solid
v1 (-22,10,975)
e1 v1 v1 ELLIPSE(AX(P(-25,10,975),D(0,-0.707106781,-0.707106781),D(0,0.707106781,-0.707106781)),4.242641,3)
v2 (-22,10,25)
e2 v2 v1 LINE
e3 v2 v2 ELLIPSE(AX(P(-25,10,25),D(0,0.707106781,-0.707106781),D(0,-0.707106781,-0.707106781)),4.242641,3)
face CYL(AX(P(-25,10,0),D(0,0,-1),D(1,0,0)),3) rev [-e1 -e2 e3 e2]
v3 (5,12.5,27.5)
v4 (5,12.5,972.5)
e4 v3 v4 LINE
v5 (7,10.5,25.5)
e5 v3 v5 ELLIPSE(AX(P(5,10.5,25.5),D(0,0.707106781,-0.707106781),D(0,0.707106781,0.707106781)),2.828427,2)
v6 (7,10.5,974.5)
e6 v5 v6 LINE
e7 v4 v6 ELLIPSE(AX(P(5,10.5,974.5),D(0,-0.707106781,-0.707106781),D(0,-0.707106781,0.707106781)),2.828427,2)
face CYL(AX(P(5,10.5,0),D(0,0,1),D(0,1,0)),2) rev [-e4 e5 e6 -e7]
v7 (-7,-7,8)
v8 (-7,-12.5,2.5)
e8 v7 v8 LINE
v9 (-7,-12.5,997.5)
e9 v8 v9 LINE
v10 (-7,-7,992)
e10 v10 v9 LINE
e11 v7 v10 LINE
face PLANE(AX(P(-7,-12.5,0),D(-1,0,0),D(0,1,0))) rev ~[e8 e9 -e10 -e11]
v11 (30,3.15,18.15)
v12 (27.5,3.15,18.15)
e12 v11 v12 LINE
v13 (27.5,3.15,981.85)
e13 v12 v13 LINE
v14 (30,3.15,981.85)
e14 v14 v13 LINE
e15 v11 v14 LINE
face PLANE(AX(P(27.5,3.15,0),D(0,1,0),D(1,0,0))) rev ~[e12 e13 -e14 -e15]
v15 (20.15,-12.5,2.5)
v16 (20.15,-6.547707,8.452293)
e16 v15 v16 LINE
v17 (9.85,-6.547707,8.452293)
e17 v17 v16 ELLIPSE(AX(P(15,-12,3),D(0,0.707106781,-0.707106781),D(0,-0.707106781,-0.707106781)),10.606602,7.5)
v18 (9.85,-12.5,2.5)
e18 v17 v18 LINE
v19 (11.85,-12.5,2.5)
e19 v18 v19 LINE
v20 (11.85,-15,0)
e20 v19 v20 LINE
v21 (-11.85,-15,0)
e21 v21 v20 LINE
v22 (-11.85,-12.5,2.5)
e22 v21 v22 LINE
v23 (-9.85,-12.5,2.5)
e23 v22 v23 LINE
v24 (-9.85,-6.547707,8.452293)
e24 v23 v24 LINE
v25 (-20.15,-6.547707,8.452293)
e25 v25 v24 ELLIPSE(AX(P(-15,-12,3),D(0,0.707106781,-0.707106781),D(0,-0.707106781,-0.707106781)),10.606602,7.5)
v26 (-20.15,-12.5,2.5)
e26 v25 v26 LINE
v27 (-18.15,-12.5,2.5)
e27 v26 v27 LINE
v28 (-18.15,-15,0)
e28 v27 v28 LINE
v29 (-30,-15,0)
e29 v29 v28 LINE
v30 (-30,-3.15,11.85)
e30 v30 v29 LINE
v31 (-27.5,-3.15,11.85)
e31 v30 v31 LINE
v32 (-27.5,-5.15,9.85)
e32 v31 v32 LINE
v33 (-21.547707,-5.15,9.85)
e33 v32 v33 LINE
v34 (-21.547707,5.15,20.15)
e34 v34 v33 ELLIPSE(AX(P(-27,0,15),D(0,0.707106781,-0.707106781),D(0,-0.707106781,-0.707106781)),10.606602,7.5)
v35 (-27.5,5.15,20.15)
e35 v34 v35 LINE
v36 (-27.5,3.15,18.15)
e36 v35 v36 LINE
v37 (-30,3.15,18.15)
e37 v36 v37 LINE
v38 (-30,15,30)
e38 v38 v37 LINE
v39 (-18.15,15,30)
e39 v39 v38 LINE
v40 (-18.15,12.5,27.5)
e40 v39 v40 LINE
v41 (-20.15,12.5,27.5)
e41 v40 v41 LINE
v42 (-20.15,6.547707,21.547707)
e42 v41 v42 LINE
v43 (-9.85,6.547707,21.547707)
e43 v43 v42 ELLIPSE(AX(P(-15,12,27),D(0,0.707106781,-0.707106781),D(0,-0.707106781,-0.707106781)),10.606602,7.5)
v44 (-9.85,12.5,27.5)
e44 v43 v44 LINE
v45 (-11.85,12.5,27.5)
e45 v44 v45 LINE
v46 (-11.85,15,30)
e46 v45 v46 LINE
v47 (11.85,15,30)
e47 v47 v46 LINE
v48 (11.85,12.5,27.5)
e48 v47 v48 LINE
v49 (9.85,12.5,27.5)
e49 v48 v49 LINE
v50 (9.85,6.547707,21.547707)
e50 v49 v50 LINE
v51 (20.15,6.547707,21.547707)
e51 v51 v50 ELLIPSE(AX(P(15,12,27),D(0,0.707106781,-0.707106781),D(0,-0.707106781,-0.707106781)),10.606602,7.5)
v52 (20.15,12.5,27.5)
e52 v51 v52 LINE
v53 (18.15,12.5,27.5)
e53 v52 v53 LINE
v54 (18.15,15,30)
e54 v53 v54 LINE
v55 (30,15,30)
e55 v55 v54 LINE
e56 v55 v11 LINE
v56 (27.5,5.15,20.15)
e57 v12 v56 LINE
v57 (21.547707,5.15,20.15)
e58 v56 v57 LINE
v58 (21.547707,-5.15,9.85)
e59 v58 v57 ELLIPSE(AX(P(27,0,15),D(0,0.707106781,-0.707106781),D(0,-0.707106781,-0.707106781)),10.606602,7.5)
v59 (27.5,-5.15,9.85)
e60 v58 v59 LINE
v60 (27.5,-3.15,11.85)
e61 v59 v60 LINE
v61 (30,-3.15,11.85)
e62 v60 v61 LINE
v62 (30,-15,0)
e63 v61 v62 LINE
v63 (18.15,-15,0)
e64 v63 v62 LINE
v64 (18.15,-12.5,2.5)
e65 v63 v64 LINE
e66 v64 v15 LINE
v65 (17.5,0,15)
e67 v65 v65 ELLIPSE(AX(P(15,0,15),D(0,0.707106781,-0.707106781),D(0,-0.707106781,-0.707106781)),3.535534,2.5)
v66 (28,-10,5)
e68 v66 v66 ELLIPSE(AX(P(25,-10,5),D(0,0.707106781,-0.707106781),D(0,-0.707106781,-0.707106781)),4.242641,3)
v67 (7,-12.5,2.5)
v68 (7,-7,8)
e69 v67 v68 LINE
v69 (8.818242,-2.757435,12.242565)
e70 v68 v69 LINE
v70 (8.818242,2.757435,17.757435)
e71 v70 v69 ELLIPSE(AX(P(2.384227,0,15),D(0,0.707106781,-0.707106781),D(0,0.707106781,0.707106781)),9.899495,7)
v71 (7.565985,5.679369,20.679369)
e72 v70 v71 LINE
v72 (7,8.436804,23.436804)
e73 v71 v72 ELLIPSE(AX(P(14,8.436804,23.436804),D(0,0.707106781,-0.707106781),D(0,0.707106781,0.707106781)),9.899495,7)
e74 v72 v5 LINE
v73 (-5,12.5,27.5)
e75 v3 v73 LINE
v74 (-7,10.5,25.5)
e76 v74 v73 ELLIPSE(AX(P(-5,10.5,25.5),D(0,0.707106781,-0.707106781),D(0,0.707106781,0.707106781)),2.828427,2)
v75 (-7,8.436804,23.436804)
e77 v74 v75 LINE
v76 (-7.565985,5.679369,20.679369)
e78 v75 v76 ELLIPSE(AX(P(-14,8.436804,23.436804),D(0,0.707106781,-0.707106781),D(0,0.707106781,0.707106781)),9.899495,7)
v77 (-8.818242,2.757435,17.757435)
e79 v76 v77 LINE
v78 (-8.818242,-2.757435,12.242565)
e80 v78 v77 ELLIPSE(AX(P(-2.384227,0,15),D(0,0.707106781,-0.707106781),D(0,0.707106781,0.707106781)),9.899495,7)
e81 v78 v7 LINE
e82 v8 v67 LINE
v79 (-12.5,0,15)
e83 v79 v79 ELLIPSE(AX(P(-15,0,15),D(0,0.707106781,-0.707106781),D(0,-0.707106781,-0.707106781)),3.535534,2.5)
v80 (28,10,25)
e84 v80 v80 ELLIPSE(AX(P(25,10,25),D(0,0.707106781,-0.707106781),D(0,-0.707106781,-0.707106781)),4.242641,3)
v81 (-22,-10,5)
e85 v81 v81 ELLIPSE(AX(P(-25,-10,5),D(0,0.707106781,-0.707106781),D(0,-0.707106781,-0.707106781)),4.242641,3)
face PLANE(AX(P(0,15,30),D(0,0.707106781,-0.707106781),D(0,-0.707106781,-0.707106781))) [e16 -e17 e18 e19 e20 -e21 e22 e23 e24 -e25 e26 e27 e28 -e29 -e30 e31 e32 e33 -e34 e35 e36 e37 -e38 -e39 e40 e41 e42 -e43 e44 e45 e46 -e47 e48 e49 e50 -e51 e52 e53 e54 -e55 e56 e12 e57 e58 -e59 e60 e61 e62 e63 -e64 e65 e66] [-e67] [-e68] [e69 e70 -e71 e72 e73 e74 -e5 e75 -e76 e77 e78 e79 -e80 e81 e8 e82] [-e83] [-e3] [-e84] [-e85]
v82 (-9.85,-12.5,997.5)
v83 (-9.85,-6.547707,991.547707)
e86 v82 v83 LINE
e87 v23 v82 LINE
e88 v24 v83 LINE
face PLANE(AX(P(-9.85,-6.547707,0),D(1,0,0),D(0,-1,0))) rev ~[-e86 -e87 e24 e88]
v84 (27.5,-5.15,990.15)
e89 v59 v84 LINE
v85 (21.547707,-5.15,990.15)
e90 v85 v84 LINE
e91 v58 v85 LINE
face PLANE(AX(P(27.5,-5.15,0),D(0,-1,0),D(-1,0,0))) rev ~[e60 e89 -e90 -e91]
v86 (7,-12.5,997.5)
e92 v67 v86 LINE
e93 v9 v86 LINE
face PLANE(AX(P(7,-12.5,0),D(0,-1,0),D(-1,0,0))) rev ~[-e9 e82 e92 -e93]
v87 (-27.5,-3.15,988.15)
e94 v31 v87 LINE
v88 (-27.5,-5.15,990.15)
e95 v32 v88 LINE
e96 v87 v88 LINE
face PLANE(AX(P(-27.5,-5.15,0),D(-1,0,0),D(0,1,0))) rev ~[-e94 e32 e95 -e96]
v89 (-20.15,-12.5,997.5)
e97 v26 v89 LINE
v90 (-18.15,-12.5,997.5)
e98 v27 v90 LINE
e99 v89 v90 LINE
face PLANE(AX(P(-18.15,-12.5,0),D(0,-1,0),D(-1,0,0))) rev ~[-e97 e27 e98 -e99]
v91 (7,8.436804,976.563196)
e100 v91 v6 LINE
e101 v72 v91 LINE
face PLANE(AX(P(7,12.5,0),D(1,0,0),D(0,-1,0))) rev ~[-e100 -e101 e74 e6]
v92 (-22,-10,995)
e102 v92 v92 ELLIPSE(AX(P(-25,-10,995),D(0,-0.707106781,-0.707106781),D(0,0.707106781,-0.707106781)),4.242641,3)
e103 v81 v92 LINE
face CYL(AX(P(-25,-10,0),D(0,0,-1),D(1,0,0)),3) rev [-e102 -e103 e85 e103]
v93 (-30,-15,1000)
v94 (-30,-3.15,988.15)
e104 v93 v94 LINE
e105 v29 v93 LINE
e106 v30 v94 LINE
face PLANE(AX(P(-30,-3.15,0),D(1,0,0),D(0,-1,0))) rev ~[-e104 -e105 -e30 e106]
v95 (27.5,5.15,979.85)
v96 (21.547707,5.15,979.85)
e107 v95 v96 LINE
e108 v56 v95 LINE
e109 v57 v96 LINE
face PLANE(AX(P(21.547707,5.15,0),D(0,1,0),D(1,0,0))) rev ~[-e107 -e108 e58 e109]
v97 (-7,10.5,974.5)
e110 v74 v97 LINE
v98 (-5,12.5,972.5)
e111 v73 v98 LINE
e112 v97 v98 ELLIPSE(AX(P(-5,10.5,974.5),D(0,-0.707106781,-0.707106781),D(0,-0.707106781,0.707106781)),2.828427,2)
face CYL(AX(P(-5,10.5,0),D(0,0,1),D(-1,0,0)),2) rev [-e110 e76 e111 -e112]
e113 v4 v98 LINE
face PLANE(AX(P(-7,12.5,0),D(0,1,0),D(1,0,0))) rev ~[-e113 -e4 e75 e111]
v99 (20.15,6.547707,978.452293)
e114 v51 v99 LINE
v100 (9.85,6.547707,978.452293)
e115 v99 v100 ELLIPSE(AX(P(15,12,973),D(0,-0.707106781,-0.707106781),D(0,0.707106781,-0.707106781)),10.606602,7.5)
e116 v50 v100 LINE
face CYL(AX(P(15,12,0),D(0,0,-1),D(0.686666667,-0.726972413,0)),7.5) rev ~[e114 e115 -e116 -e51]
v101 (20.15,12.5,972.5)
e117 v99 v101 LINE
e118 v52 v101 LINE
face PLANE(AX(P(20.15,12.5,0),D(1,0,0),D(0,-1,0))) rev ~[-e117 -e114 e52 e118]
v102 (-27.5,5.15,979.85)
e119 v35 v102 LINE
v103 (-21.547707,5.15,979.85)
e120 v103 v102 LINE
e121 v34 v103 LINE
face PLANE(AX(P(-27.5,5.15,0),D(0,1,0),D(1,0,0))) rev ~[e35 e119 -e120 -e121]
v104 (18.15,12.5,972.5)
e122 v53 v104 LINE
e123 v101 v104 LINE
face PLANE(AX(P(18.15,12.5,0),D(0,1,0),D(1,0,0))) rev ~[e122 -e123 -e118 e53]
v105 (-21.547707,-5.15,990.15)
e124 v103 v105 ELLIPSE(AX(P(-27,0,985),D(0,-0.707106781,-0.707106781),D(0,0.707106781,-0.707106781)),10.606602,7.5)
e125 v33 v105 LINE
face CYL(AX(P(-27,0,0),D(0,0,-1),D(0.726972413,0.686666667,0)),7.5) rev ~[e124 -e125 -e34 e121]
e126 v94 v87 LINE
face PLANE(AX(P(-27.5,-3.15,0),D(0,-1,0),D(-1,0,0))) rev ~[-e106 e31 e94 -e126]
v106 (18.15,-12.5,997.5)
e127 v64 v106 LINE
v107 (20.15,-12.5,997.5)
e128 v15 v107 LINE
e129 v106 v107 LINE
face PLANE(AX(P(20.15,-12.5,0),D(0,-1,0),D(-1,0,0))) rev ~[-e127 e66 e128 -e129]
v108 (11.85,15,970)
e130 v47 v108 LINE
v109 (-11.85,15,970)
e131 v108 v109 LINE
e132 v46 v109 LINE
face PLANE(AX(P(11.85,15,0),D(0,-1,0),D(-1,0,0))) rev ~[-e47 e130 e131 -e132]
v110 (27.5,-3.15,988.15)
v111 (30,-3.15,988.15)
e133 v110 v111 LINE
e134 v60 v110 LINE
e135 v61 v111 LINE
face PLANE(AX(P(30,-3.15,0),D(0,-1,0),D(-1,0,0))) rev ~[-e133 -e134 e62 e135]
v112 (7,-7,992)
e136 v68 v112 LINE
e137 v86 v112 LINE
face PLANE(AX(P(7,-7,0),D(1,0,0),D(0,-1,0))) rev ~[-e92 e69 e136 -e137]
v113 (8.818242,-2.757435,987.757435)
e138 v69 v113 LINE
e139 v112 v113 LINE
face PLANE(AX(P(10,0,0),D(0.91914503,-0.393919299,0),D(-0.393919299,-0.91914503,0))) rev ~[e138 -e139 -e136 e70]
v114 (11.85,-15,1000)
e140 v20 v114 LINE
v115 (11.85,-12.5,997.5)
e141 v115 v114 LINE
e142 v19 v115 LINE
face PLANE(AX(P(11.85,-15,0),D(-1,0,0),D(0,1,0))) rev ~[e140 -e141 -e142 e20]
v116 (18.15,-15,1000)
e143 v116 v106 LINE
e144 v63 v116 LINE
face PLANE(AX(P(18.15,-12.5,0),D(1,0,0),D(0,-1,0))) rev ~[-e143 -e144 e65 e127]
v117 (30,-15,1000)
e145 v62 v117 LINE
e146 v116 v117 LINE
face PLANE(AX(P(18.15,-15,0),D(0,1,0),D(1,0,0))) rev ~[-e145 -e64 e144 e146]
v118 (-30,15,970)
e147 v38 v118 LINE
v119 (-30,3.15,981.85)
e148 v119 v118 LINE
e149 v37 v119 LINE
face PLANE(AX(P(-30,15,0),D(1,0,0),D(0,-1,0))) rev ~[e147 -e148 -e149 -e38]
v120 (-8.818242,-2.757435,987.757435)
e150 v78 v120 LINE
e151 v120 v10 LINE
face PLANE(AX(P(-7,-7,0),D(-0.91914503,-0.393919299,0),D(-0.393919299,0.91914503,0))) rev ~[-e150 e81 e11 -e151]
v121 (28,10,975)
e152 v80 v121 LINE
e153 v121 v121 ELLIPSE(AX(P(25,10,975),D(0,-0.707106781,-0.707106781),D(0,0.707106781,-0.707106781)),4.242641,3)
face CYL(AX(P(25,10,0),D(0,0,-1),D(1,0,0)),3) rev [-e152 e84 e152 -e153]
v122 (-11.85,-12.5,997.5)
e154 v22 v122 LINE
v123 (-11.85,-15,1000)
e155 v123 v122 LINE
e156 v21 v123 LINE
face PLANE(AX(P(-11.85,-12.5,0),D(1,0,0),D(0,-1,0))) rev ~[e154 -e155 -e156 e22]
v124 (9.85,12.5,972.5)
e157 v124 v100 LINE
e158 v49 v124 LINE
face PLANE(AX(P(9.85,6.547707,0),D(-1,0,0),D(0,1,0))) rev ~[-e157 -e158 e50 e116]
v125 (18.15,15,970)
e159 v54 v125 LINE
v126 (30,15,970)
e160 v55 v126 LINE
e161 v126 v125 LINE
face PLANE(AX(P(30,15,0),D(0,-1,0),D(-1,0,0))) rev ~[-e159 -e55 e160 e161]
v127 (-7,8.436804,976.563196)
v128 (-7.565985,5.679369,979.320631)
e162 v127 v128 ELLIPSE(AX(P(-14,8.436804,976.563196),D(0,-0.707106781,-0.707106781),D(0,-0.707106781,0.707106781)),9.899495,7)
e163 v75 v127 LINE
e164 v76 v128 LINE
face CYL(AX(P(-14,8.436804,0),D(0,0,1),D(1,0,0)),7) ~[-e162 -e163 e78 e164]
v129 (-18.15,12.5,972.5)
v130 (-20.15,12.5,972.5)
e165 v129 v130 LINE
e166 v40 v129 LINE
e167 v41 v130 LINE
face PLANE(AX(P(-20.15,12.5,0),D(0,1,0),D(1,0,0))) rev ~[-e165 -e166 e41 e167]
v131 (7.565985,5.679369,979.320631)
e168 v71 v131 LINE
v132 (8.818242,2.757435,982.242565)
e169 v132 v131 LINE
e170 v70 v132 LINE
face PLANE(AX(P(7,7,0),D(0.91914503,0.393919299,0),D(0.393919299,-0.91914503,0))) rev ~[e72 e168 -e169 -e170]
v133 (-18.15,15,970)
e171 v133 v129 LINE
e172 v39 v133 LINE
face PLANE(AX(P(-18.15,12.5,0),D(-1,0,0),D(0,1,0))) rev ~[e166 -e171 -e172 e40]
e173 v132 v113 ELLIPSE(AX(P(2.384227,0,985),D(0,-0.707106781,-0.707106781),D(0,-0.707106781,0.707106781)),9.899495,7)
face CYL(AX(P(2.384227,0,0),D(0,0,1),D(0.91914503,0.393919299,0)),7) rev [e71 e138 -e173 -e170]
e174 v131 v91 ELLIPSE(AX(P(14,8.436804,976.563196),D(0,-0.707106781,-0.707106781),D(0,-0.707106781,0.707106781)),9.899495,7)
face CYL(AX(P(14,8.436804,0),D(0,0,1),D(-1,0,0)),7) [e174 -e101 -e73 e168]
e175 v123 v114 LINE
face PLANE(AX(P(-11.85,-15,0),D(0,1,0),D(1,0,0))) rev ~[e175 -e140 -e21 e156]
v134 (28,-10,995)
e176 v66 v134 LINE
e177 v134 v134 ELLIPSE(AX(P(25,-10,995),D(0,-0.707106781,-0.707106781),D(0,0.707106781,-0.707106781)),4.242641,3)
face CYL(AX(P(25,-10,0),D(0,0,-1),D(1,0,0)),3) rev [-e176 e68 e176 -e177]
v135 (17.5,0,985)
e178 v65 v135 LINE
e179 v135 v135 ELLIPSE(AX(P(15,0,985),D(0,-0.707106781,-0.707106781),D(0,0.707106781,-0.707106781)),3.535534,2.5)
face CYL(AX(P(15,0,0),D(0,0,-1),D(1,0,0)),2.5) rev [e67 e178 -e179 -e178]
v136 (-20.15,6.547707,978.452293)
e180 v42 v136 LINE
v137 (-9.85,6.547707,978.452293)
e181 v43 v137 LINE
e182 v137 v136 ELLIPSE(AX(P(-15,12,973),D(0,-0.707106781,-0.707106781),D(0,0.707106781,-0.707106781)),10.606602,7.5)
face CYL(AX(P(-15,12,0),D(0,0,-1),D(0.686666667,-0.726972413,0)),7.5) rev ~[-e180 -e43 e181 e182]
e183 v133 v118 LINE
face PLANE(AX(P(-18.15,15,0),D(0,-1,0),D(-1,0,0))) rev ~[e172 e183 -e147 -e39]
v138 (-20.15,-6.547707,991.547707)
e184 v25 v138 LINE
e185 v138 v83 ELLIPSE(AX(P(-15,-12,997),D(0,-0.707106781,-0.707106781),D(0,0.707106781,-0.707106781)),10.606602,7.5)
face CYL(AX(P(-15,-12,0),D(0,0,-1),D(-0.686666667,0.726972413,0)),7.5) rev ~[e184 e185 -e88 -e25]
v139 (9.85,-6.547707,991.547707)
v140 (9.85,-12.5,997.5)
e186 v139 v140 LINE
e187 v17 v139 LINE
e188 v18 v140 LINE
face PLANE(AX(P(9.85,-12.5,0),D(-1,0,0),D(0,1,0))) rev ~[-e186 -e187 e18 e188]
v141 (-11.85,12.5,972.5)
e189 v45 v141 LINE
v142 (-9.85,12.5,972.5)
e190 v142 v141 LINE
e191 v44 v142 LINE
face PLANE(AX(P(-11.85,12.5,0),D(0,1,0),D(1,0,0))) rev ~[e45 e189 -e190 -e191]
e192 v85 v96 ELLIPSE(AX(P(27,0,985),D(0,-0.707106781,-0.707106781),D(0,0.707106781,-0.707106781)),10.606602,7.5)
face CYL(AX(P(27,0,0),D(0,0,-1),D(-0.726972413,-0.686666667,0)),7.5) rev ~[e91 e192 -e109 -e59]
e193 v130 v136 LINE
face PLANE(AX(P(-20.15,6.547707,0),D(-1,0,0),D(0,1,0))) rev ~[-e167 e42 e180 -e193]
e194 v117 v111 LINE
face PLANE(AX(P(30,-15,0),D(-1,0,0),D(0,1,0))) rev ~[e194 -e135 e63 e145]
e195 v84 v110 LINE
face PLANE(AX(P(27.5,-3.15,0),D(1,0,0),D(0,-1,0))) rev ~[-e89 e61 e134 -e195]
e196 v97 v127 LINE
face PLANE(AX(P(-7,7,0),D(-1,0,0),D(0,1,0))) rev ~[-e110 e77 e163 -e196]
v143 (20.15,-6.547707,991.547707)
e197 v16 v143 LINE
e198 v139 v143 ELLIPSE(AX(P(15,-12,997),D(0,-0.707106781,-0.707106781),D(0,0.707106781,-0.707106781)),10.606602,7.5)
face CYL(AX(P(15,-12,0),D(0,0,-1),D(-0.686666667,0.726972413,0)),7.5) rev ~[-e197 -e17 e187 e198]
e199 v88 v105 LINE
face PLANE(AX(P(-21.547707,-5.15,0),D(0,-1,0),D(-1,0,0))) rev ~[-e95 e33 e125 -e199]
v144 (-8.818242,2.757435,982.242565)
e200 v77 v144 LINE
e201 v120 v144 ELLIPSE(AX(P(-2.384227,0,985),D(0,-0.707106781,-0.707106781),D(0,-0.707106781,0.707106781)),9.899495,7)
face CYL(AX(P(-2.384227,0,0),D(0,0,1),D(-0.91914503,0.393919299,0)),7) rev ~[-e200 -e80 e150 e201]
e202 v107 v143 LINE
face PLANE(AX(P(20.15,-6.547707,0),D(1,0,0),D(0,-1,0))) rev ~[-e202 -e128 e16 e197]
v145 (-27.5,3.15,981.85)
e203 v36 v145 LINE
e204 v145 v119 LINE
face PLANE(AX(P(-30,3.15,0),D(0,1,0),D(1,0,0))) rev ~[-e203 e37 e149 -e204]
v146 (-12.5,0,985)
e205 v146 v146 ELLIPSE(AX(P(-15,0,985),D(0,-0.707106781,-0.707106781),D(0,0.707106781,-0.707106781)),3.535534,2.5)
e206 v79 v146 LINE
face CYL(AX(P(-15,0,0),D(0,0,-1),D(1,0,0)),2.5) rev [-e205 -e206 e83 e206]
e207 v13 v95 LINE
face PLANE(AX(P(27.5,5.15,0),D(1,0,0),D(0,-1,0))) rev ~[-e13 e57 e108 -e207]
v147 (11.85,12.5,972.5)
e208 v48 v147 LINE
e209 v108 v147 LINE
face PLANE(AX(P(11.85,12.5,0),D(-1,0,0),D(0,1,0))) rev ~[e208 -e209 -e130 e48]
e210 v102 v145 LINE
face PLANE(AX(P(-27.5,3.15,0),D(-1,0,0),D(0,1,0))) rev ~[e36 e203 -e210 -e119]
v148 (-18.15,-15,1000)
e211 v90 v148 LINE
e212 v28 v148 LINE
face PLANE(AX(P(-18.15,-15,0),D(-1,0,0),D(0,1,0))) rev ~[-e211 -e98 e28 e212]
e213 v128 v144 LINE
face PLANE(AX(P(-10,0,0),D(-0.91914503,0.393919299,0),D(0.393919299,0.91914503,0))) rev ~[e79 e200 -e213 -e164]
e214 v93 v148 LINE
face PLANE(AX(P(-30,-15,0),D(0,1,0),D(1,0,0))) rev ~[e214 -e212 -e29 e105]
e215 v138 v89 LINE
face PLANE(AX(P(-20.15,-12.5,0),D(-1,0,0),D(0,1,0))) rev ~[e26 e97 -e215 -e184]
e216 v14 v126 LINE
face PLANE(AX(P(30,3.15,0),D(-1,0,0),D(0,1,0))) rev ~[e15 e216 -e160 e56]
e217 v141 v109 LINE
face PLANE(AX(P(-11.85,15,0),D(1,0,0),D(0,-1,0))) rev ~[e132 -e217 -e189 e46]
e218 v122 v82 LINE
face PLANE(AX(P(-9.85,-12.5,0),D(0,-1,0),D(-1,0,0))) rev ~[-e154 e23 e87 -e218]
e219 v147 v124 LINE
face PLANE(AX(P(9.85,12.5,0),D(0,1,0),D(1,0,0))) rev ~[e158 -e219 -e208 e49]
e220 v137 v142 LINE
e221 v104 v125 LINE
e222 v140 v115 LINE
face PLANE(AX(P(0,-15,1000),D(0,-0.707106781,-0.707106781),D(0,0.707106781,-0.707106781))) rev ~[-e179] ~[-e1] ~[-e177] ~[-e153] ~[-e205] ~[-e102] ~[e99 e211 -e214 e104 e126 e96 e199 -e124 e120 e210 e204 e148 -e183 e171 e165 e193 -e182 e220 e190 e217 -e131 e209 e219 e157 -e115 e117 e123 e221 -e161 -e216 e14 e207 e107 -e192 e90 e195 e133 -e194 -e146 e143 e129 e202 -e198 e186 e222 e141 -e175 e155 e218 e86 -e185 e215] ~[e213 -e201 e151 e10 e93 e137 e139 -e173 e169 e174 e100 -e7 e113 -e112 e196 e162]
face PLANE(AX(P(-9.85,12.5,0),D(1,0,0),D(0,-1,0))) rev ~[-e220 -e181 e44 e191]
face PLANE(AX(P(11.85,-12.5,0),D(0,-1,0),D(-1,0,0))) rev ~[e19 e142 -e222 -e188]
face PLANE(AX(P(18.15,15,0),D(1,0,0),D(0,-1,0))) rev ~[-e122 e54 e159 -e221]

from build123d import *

# Parameters (mm, degrees)
F0_R     = 3
F0_R_2   = 2.5
F1_DEPTH = 1000
F2_R     = 2
F3_R     = 7
F5_DEPTH = 30


# Not quite as in the source:
# - a feature names something its author has since deleted; it is built from what else it names


with BuildPart() as f1:
    # F0 (on Top) → F1 (new body)
    with BuildSketch(Plane.XY):
        with BuildLine():
            Line((18.15, -15), (30, -15))
            Line((30, -15), (30, -3.15))
            Line((30, -3.15), (27.5, -3.15))
            Line((27.5, -3.15), (27.5, -5.15))
            Line((27.5, -5.15), (21.5477069044, -5.15))
            ThreePointArc((21.5477069044, -5.15), (19.5, 0), (21.5477069044, 5.15))
            Line((21.5477069044, 5.15), (27.5, 5.15))
            Line((27.5, 5.15), (27.5, 3.15))
            Line((27.5, 3.15), (30, 3.15))
            Line((30, 3.15), (30, 15))
            Line((30, 15), (18.15, 15))
            Line((18.15, 15), (18.15, 12.5))
            Line((18.15, 12.5), (20.15, 12.5))
            Line((20.15, 12.5), (20.15, 6.5477069044))
            ThreePointArc((20.15, 6.5477069044), (15, 4.5), (9.85, 6.5477069044))
            Line((9.85, 6.5477069044), (9.85, 12.5))
            Line((9.85, 12.5), (11.85, 12.5))
            Line((11.85, 12.5), (11.85, 15))
            Line((11.85, 15), (-11.85, 15))
            Line((-11.85, 15), (-11.85, 12.5))
            Line((-11.85, 12.5), (-9.85, 12.5))
            Line((-9.85, 12.5), (-9.85, 6.5477069044))
            ThreePointArc((-9.85, 6.5477069044), (-15, 4.5), (-20.15, 6.5477069044))
            Line((-20.15, 6.5477069044), (-20.15, 12.5))
            Line((-20.15, 12.5), (-18.15, 12.5))
            Line((-18.15, 12.5), (-18.15, 15))
            Line((-18.15, 15), (-30, 15))
            Line((-30, 15), (-30, 3.15))
            Line((-30, 3.15), (-27.5, 3.15))
            Line((-27.5, 3.15), (-27.5, 5.15))
            Line((-27.5, 5.15), (-21.5477069044, 5.15))
            ThreePointArc((-21.5477069044, 5.15), (-19.5, 0), (-21.5477069044, -5.15))
            Line((-21.5477069044, -5.15), (-27.5, -5.15))
            Line((-27.5, -5.15), (-27.5, -3.15))
            Line((-27.5, -3.15), (-30, -3.15))
            Line((-30, -3.15), (-30, -15))
            Line((-30, -15), (-18.15, -15))
            Line((-18.15, -15), (-18.15, -12.5))
            Line((-18.15, -12.5), (-20.15, -12.5))
            Line((-20.15, -12.5), (-20.15, -6.5477069044))
            ThreePointArc((-20.15, -6.5477069044), (-15, -4.5), (-9.85, -6.5477069044))
            Line((-9.85, -6.5477069044), (-9.85, -12.5))
            Line((-9.85, -12.5), (-11.85, -12.5))
            Line((-11.85, -12.5), (-11.85, -15))
            Line((-11.85, -15), (11.85, -15))
            Line((11.85, -15), (11.85, -12.5))
            Line((11.85, -12.5), (9.85, -12.5))
            Line((9.85, -12.5), (9.85, -6.5477069044))
            ThreePointArc((9.85, -6.5477069044), (15, -4.5), (20.15, -6.5477069044))
            Line((20.15, -6.5477069044), (20.15, -12.5))
            Line((20.15, -12.5), (18.15, -12.5))
            Line((18.15, -12.5), (18.15, -15))
        make_face()
        with Locations((-25, -10)):
            Circle(F0_R, mode=Mode.SUBTRACT)
        with Locations((25, -10)):
            Circle(F0_R, mode=Mode.SUBTRACT)
        with Locations((-15, 0)):
            Circle(F0_R_2, mode=Mode.SUBTRACT)
        with Locations((-25, 10)):
            Circle(F0_R, mode=Mode.SUBTRACT)
        Polygon((-7, 7), (-7, 12.5), (0, 12.5), (7, 12.5), (7, 7), (10, 0), (7, -7), (7, -12.5), (0, -12.5), (-7, -12.5), (-7, -7), (-10, 0), align=None, mode=Mode.SUBTRACT)
        with Locations((15, 0)):
            Circle(F0_R_2, mode=Mode.SUBTRACT)
        with Locations((25, 10)):
            Circle(F0_R, mode=Mode.SUBTRACT)
    extrude(amount=F1_DEPTH)

    # F2
    f2_edges = [f1.edges().sort_by_distance(p)[0] for p in [
        (-7, 12.5, 500),
        (7, 12.5, 500),
    ]]
    fillet(f2_edges, radius=F2_R)

    # F3
    f3_edges = [f1.edges().sort_by_distance(p)[0] for p in [
        (-7, 7, 500),
        (-10, 0, 500),
        (7, 7, 500),
        (10, 0, 500),
    ]]
    fillet(f3_edges, radius=F3_R)

    # F4 (on Right) → F5 (cut, symmetric)
    with BuildSketch(Plane.YZ):
        Polygon((15, 30), (-15, 0), (15, 0), align=None)
        Polygon((15, 1000), (-15, 1000), (15, 970), align=None)
    extrude(amount=F5_DEPTH, both=True, mode=Mode.SUBTRACT)


solid = f1.part
